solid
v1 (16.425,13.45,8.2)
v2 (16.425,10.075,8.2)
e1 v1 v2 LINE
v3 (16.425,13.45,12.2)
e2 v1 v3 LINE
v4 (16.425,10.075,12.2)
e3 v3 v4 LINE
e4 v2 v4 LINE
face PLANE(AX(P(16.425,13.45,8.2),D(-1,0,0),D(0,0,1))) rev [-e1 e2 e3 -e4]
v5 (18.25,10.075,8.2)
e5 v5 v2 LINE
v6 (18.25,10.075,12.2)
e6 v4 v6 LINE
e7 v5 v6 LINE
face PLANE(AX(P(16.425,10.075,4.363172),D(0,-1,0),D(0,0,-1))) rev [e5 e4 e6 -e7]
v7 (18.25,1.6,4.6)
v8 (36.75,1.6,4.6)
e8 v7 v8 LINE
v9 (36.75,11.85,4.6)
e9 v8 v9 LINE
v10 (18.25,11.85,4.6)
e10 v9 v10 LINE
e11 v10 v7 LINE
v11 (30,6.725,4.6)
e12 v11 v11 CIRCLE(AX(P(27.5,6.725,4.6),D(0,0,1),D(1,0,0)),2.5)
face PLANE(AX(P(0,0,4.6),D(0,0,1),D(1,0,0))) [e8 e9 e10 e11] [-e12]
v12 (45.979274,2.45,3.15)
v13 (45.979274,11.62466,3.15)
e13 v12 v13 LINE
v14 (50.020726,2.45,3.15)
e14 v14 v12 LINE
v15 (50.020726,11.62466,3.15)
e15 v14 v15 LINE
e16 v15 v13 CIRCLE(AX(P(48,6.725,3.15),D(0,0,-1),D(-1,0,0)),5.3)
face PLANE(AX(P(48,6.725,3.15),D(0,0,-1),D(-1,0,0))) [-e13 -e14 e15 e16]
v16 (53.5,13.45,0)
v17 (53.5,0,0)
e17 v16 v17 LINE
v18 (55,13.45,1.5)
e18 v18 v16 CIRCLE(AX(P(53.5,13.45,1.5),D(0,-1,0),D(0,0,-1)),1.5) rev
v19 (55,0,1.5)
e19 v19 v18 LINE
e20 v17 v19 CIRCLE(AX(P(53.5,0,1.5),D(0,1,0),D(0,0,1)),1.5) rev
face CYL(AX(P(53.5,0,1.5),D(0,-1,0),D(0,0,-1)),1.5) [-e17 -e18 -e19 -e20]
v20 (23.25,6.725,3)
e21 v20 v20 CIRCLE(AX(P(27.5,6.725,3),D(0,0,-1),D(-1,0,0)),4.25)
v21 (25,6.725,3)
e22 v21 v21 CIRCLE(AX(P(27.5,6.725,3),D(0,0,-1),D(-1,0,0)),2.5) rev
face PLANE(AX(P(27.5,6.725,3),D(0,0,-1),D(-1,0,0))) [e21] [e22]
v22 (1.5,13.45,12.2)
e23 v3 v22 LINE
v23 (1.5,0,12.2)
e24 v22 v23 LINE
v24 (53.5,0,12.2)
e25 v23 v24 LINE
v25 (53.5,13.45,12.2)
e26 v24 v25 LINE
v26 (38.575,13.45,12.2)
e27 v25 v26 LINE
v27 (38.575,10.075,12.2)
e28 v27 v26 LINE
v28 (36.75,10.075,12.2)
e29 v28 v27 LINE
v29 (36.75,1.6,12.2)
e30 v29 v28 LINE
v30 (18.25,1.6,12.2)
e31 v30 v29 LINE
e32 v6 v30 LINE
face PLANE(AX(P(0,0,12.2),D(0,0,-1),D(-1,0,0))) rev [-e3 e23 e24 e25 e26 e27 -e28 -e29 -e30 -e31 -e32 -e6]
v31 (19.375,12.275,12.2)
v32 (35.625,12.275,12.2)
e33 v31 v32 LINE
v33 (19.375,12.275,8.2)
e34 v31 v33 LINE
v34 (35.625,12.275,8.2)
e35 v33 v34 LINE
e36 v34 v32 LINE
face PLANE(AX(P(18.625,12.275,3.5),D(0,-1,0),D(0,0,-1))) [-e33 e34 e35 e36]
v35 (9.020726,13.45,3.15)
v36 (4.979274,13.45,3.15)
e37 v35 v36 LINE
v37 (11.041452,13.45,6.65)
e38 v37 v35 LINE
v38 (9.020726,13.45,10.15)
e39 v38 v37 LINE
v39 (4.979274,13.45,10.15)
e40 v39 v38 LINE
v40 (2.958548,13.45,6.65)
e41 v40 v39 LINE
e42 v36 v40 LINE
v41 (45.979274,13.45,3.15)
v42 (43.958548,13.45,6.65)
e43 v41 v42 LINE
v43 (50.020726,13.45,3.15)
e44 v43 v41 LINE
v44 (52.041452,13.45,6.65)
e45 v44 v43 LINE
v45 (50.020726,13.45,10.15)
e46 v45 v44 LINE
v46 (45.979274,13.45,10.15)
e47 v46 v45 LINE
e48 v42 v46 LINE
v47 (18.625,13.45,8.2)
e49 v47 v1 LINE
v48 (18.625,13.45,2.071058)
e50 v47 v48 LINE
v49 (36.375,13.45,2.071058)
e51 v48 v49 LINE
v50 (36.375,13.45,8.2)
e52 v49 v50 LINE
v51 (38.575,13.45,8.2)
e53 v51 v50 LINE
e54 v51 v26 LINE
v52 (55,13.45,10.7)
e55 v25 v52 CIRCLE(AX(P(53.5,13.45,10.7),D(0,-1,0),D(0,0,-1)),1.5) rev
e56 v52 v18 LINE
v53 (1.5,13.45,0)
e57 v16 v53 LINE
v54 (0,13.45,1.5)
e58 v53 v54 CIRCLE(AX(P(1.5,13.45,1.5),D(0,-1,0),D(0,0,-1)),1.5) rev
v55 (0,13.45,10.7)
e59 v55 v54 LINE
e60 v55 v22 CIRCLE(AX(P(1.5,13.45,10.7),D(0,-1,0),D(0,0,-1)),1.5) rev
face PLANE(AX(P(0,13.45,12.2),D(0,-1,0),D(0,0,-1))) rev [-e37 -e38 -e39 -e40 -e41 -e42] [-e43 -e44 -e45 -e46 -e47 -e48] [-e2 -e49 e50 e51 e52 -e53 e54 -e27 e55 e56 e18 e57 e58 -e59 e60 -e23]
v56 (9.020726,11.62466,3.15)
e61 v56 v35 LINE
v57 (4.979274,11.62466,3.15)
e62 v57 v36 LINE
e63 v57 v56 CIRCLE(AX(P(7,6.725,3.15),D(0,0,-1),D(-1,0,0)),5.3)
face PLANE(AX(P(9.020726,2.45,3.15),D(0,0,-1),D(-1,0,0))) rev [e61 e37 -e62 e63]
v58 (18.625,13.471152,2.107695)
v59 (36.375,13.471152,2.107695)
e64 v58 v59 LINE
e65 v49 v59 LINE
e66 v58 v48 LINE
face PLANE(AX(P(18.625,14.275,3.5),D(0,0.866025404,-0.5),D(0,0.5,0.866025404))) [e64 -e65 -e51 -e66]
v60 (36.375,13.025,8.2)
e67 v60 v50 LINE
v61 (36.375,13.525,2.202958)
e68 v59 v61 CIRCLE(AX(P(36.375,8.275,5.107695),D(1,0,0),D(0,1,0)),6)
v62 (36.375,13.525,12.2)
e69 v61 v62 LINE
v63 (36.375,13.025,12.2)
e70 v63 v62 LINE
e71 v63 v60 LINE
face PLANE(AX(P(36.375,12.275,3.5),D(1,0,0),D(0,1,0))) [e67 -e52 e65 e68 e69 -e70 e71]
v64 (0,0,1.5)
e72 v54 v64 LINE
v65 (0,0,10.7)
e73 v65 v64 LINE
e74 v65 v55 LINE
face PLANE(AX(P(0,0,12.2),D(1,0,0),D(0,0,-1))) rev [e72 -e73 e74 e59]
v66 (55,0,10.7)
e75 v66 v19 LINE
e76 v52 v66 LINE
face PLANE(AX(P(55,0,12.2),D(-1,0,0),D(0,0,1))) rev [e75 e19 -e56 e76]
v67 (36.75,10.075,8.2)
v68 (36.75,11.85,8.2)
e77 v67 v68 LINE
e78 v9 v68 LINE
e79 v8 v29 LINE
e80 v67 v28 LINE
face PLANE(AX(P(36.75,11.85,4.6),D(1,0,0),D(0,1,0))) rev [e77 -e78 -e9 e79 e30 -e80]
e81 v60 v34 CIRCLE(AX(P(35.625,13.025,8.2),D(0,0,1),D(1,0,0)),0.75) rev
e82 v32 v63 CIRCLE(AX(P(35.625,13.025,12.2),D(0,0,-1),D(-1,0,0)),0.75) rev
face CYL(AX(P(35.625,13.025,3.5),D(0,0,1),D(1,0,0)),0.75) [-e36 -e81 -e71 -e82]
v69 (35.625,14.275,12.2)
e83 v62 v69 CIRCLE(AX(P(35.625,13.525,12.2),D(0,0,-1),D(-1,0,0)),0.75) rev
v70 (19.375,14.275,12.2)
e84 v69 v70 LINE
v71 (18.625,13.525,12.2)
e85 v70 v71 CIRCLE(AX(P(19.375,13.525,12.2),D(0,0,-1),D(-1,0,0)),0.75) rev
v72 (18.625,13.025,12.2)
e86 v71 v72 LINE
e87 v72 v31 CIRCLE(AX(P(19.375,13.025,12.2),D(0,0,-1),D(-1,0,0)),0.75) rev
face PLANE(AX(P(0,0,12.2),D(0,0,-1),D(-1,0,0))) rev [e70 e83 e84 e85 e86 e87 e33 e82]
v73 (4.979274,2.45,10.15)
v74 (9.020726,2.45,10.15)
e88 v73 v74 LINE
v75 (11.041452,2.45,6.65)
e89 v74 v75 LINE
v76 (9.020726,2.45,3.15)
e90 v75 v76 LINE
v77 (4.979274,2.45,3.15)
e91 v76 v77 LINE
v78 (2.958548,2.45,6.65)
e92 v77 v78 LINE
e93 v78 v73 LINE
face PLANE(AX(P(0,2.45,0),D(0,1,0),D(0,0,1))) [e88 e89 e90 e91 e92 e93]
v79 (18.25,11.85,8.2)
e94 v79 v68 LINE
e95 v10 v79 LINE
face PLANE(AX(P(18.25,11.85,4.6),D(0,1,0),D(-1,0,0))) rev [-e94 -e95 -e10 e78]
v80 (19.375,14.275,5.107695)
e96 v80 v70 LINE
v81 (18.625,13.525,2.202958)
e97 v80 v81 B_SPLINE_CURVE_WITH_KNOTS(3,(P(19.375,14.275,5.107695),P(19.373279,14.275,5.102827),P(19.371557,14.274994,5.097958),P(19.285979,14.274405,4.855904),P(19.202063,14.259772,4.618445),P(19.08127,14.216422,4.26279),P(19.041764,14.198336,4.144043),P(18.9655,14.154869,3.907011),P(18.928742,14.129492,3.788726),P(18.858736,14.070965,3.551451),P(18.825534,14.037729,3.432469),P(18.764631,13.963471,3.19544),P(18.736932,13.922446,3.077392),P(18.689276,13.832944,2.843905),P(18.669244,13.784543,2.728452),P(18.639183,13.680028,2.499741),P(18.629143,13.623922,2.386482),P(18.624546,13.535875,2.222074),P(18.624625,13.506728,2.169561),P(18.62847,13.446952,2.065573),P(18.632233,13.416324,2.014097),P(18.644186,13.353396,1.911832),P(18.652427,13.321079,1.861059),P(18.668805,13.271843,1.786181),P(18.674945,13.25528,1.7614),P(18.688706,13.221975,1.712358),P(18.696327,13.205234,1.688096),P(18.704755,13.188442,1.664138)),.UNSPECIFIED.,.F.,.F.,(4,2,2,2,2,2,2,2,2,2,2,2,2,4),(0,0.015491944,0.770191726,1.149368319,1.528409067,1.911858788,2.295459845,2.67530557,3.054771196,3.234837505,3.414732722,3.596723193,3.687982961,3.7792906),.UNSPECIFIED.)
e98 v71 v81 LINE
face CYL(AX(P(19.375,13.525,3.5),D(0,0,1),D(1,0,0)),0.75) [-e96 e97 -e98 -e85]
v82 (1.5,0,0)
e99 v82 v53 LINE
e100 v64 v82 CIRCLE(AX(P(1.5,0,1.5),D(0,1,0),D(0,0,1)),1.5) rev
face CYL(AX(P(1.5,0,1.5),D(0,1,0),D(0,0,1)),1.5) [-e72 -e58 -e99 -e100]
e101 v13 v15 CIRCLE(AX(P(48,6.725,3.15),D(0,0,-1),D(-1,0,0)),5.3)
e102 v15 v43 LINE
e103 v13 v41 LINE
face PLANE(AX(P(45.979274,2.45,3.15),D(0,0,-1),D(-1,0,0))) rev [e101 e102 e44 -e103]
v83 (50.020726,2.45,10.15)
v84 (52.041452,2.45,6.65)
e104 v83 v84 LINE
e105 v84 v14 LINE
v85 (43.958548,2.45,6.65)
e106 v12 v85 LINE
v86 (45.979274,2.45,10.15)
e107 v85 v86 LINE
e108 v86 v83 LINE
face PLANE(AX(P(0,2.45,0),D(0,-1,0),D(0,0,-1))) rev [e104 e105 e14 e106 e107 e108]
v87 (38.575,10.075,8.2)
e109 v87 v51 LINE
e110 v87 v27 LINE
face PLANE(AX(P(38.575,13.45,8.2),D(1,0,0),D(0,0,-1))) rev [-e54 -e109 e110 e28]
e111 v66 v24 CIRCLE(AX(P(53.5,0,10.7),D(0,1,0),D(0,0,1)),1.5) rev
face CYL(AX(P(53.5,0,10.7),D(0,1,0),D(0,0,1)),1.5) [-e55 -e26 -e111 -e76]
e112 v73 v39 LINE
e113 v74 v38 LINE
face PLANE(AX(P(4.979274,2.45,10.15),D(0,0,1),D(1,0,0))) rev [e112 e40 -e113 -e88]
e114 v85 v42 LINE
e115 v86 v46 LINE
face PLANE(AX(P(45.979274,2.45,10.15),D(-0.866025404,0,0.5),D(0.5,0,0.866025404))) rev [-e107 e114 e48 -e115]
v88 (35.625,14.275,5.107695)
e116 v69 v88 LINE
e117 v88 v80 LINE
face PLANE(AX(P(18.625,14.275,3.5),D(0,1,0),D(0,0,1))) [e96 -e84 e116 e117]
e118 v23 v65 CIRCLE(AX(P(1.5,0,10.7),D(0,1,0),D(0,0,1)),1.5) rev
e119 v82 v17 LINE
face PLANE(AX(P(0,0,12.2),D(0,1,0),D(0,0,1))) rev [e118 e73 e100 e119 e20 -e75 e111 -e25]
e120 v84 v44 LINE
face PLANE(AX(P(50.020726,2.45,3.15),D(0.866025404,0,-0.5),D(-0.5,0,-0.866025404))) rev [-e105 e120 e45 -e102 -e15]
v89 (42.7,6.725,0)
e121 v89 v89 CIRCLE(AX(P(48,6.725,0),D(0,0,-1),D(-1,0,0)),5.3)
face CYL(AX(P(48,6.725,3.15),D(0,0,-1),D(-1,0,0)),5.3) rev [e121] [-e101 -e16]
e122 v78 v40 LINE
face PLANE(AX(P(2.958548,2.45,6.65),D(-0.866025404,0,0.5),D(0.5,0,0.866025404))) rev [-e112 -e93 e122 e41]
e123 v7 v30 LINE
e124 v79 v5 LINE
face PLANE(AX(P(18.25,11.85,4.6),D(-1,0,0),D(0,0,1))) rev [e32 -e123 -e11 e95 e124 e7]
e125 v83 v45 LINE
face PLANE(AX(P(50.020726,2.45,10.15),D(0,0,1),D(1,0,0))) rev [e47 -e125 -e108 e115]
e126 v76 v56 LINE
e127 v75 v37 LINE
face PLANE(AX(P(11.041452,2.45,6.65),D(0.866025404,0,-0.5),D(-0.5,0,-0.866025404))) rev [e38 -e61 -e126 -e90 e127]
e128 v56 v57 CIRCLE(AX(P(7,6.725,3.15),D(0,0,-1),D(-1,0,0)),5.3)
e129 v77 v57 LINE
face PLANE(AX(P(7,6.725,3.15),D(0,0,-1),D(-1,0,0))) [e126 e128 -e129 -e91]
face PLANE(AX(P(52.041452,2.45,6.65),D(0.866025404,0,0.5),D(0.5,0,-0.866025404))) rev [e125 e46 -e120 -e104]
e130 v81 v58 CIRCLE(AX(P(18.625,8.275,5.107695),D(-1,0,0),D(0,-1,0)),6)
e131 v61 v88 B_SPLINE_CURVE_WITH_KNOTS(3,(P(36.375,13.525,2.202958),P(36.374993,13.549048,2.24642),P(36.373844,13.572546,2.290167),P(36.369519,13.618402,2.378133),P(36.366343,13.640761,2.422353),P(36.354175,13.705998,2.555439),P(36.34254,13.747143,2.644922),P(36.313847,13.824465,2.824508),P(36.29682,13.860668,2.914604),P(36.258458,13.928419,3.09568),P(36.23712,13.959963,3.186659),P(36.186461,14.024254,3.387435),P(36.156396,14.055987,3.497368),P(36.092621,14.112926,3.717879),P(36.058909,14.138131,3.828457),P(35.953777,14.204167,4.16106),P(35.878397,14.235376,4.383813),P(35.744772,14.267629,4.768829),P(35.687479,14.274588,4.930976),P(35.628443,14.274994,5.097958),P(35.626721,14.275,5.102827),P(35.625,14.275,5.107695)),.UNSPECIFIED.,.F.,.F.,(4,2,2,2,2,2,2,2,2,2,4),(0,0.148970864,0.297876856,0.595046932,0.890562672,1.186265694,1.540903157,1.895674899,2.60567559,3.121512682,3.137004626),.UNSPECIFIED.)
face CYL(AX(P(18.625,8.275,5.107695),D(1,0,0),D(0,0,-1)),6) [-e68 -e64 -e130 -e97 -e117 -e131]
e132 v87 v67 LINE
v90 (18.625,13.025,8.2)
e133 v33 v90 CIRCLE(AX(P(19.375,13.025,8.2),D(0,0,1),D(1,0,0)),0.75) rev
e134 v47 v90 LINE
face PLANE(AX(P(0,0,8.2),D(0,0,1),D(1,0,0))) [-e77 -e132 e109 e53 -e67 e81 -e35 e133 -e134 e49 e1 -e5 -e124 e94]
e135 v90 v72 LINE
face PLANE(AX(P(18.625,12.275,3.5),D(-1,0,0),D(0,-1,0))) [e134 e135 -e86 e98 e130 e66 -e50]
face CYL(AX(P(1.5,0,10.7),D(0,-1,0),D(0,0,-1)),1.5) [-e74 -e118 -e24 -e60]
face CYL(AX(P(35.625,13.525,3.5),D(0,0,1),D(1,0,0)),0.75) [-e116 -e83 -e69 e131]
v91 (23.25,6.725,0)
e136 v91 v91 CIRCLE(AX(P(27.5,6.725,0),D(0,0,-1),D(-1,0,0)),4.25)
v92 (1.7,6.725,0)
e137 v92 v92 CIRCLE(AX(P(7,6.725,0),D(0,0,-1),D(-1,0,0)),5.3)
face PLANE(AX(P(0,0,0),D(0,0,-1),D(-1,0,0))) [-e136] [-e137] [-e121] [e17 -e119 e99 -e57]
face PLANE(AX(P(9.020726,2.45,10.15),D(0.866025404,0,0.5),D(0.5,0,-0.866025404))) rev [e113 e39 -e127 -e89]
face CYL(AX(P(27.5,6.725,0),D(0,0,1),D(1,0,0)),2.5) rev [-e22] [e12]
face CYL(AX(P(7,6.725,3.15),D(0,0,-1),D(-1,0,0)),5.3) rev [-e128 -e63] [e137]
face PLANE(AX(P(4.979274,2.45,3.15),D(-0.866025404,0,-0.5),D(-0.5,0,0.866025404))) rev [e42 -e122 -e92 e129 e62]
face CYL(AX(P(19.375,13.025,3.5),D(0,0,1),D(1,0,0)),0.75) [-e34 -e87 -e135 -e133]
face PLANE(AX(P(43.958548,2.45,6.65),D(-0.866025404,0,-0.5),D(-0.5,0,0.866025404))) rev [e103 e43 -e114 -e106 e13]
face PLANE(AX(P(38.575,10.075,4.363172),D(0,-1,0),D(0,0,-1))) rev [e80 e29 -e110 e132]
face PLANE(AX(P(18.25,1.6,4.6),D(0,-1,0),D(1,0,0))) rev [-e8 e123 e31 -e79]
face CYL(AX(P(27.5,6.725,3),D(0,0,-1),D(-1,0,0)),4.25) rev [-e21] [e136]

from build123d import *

# Parameters (mm, degrees)
SKETCH2_W           = 55
SKETCH2_H           = 13.45
BOSS_EXTRUDE1_DEPTH = 12.2
SKETCH3_W           = 18.5
SKETCH3_H           = 10.25
CUT_EXTRUDE1_DEPTH  = 7.6
SKETCH5_W           = 22.15
SKETCH5_H           = 1.6
CUT_EXTRUDE2_DEPTH  = 4
SKETCH6_W           = 17.75
SKETCH6_H           = 2
BOSS_EXTRUDE2_DEPTH = 8.7
SKETCH7_W           = 1.825
SKETCH7_H           = 3.375
CUT_EXTRUDE3_DEPTH  = 4
FILLET1_R           = 0.75
FILLET3_R           = 0.75
DRAFT4_ANGLE        = 60
FILLET5_R           = 6
SKETCH8_R           = 2.5
CUT_EXTRUDE4_DEPTH  = 58.328314378
SKETCH9_R           = 4.25
CUT_EXTRUDE5_DEPTH  = 3
SKETCH10_R          = 5.3
CUT_EXTRUDE6_DEPTH  = 3.15
CUT_EXTRUDE7_DEPTH  = 11
FILLET6_R           = 1.5


with BuildPart() as part:
    # Sketch2 → Boss-Extrude1 (new body)
    with BuildSketch(Plane.XY):
        with Locations((27.5, 6.725)):
            Rectangle(SKETCH2_W, SKETCH2_H)
    extrude(amount=BOSS_EXTRUDE1_DEPTH)

    # Sketch3 → Cut-Extrude1 (cut)
    with BuildSketch(Plane.XY.offset(12.2)):
        with Locations((27.5, 6.725)):
            Rectangle(SKETCH3_W, SKETCH3_H)
    extrude(amount=-CUT_EXTRUDE1_DEPTH, mode=Mode.SUBTRACT)

    # Sketch5 → Cut-Extrude2 (cut)
    with BuildSketch(Plane.XY.offset(12.2)):
        with Locations((27.5, 12.65)):
            Rectangle(SKETCH5_W, SKETCH5_H)
    extrude(amount=-CUT_EXTRUDE2_DEPTH, mode=Mode.SUBTRACT)

    # Sketch6 → Boss-Extrude2 (add)
    with BuildSketch(Plane.XY.offset(12.2)):
        with Locations((27.5, 13.275)):
            Rectangle(SKETCH6_W, SKETCH6_H)
    extrude(amount=-BOSS_EXTRUDE2_DEPTH)

    # Sketch7 → Cut-Extrude3 (cut)
    with BuildSketch(Plane.XY.offset(12.2)):
        with Locations((37.6625, 11.7625)):
            Rectangle(SKETCH7_W, SKETCH7_H)
        with Locations((17.3375, 11.7625)):
            Rectangle(SKETCH7_W, SKETCH7_H)
    extrude(amount=-CUT_EXTRUDE3_DEPTH, mode=Mode.SUBTRACT)

    # Fillet1
    fillet1_edges = [part.edges().sort_by_distance(p)[0] for p in [
        (36.375, 14.275, 7.85),
        (36.375, 12.275, 10.2),
    ]]
    fillet(fillet1_edges, radius=FILLET1_R)

    # Fillet3
    fillet3_edges = [part.edges().sort_by_distance(p)[0] for p in [
        (18.625, 12.275, 10.2),
        (18.625, 14.275, 7.85),
    ]]
    fillet(fillet3_edges, radius=FILLET3_R)

    # Draft4
    draft4_faces = [part.faces().sort_by_distance(p)[0] for p in [
        (27.5, 13.858393484, 3.5),
    ]]
    draft(draft4_faces, Plane(origin=(18.625, 14.275, 3.5), x_dir=(0, 0, 1), z_dir=(0, 1, 0)), DRAFT4_ANGLE)

    # Fillet5
    # the kernel refuses this fillet: 6 mm, written as the material it takes off along each edge
    with BuildSketch(Plane(origin=(39.644237886, 14.275, 3.5), x_dir=(0, -0.49999999999999806, -0.8660254037844397), z_dir=(-1, 0, 0))) as fillet5_piece_1:
        with BuildLine():
            CenterArc((FILLET5_R * 0.267949192431, FILLET5_R), FILLET5_R, 240, 30)
            Line((-FILLET5_R * 0.232050807569, FILLET5_R * 0.133974596216), (0, 0))
            Line((0, 0), (FILLET5_R * 0.267949192431, 0))
        make_face()
    extrude(amount=24.288475773, mode=Mode.SUBTRACT)

    # Sketch8 → Cut-Extrude4 (cut, through all)
    with BuildSketch(Plane.XY.offset(4.6)):
        with Locations((27.5, 6.725)):
            Circle(SKETCH8_R)
    extrude(amount=-CUT_EXTRUDE4_DEPTH, mode=Mode.SUBTRACT)

    # Sketch9 → Cut-Extrude5 (cut)
    with BuildSketch(Plane(origin=(0, 0, 0), x_dir=(-1, 0, 0), z_dir=(0, 0, -1))):
        with Locations((-27.5, 6.725)):
            Circle(SKETCH9_R)
    extrude(amount=-CUT_EXTRUDE5_DEPTH, mode=Mode.SUBTRACT)

    # Sketch10 → Cut-Extrude6 (cut)
    with BuildSketch(Plane(origin=(0, 0, 0), x_dir=(-1, 0, 0), z_dir=(0, 0, -1))):
        with Locations((-48, 6.725)):
            Circle(SKETCH10_R)
        with Locations((-7, 6.725)):
            Circle(SKETCH10_R)
    extrude(amount=-CUT_EXTRUDE6_DEPTH, mode=Mode.SUBTRACT)

    # Sketch11 → Cut-Extrude7 (cut)
    with BuildSketch(Plane(origin=(0, 13.45, 0), x_dir=(1, 0, 0), z_dir=(0, 1, 0))):
        Polygon((9.020725942, -3.15), (4.979274058, -3.15), (2.958548116, -6.65), (4.979274058, -10.15), (9.020725942, -10.15), (11.041451884, -6.65), align=None)
        Polygon((43.958548116, -6.65), (45.979274058, -3.15), (50.020725942, -3.15), (52.041451884, -6.65), (50.020725942, -10.15), (45.979274058, -10.15), align=None)
    extrude(amount=-CUT_EXTRUDE7_DEPTH, mode=Mode.SUBTRACT)

    # Fillet6
    fillet6_edges = [part.edges().sort_by_distance(p)[0] for p in [
        (55, 6.725, 12.2),
        (0, 6.725, 12.2),
        (55, 6.725, 0),
        (0, 6.725, 0),
    ]]
    fillet(fillet6_edges, radius=FILLET6_R)


solid = part.part
